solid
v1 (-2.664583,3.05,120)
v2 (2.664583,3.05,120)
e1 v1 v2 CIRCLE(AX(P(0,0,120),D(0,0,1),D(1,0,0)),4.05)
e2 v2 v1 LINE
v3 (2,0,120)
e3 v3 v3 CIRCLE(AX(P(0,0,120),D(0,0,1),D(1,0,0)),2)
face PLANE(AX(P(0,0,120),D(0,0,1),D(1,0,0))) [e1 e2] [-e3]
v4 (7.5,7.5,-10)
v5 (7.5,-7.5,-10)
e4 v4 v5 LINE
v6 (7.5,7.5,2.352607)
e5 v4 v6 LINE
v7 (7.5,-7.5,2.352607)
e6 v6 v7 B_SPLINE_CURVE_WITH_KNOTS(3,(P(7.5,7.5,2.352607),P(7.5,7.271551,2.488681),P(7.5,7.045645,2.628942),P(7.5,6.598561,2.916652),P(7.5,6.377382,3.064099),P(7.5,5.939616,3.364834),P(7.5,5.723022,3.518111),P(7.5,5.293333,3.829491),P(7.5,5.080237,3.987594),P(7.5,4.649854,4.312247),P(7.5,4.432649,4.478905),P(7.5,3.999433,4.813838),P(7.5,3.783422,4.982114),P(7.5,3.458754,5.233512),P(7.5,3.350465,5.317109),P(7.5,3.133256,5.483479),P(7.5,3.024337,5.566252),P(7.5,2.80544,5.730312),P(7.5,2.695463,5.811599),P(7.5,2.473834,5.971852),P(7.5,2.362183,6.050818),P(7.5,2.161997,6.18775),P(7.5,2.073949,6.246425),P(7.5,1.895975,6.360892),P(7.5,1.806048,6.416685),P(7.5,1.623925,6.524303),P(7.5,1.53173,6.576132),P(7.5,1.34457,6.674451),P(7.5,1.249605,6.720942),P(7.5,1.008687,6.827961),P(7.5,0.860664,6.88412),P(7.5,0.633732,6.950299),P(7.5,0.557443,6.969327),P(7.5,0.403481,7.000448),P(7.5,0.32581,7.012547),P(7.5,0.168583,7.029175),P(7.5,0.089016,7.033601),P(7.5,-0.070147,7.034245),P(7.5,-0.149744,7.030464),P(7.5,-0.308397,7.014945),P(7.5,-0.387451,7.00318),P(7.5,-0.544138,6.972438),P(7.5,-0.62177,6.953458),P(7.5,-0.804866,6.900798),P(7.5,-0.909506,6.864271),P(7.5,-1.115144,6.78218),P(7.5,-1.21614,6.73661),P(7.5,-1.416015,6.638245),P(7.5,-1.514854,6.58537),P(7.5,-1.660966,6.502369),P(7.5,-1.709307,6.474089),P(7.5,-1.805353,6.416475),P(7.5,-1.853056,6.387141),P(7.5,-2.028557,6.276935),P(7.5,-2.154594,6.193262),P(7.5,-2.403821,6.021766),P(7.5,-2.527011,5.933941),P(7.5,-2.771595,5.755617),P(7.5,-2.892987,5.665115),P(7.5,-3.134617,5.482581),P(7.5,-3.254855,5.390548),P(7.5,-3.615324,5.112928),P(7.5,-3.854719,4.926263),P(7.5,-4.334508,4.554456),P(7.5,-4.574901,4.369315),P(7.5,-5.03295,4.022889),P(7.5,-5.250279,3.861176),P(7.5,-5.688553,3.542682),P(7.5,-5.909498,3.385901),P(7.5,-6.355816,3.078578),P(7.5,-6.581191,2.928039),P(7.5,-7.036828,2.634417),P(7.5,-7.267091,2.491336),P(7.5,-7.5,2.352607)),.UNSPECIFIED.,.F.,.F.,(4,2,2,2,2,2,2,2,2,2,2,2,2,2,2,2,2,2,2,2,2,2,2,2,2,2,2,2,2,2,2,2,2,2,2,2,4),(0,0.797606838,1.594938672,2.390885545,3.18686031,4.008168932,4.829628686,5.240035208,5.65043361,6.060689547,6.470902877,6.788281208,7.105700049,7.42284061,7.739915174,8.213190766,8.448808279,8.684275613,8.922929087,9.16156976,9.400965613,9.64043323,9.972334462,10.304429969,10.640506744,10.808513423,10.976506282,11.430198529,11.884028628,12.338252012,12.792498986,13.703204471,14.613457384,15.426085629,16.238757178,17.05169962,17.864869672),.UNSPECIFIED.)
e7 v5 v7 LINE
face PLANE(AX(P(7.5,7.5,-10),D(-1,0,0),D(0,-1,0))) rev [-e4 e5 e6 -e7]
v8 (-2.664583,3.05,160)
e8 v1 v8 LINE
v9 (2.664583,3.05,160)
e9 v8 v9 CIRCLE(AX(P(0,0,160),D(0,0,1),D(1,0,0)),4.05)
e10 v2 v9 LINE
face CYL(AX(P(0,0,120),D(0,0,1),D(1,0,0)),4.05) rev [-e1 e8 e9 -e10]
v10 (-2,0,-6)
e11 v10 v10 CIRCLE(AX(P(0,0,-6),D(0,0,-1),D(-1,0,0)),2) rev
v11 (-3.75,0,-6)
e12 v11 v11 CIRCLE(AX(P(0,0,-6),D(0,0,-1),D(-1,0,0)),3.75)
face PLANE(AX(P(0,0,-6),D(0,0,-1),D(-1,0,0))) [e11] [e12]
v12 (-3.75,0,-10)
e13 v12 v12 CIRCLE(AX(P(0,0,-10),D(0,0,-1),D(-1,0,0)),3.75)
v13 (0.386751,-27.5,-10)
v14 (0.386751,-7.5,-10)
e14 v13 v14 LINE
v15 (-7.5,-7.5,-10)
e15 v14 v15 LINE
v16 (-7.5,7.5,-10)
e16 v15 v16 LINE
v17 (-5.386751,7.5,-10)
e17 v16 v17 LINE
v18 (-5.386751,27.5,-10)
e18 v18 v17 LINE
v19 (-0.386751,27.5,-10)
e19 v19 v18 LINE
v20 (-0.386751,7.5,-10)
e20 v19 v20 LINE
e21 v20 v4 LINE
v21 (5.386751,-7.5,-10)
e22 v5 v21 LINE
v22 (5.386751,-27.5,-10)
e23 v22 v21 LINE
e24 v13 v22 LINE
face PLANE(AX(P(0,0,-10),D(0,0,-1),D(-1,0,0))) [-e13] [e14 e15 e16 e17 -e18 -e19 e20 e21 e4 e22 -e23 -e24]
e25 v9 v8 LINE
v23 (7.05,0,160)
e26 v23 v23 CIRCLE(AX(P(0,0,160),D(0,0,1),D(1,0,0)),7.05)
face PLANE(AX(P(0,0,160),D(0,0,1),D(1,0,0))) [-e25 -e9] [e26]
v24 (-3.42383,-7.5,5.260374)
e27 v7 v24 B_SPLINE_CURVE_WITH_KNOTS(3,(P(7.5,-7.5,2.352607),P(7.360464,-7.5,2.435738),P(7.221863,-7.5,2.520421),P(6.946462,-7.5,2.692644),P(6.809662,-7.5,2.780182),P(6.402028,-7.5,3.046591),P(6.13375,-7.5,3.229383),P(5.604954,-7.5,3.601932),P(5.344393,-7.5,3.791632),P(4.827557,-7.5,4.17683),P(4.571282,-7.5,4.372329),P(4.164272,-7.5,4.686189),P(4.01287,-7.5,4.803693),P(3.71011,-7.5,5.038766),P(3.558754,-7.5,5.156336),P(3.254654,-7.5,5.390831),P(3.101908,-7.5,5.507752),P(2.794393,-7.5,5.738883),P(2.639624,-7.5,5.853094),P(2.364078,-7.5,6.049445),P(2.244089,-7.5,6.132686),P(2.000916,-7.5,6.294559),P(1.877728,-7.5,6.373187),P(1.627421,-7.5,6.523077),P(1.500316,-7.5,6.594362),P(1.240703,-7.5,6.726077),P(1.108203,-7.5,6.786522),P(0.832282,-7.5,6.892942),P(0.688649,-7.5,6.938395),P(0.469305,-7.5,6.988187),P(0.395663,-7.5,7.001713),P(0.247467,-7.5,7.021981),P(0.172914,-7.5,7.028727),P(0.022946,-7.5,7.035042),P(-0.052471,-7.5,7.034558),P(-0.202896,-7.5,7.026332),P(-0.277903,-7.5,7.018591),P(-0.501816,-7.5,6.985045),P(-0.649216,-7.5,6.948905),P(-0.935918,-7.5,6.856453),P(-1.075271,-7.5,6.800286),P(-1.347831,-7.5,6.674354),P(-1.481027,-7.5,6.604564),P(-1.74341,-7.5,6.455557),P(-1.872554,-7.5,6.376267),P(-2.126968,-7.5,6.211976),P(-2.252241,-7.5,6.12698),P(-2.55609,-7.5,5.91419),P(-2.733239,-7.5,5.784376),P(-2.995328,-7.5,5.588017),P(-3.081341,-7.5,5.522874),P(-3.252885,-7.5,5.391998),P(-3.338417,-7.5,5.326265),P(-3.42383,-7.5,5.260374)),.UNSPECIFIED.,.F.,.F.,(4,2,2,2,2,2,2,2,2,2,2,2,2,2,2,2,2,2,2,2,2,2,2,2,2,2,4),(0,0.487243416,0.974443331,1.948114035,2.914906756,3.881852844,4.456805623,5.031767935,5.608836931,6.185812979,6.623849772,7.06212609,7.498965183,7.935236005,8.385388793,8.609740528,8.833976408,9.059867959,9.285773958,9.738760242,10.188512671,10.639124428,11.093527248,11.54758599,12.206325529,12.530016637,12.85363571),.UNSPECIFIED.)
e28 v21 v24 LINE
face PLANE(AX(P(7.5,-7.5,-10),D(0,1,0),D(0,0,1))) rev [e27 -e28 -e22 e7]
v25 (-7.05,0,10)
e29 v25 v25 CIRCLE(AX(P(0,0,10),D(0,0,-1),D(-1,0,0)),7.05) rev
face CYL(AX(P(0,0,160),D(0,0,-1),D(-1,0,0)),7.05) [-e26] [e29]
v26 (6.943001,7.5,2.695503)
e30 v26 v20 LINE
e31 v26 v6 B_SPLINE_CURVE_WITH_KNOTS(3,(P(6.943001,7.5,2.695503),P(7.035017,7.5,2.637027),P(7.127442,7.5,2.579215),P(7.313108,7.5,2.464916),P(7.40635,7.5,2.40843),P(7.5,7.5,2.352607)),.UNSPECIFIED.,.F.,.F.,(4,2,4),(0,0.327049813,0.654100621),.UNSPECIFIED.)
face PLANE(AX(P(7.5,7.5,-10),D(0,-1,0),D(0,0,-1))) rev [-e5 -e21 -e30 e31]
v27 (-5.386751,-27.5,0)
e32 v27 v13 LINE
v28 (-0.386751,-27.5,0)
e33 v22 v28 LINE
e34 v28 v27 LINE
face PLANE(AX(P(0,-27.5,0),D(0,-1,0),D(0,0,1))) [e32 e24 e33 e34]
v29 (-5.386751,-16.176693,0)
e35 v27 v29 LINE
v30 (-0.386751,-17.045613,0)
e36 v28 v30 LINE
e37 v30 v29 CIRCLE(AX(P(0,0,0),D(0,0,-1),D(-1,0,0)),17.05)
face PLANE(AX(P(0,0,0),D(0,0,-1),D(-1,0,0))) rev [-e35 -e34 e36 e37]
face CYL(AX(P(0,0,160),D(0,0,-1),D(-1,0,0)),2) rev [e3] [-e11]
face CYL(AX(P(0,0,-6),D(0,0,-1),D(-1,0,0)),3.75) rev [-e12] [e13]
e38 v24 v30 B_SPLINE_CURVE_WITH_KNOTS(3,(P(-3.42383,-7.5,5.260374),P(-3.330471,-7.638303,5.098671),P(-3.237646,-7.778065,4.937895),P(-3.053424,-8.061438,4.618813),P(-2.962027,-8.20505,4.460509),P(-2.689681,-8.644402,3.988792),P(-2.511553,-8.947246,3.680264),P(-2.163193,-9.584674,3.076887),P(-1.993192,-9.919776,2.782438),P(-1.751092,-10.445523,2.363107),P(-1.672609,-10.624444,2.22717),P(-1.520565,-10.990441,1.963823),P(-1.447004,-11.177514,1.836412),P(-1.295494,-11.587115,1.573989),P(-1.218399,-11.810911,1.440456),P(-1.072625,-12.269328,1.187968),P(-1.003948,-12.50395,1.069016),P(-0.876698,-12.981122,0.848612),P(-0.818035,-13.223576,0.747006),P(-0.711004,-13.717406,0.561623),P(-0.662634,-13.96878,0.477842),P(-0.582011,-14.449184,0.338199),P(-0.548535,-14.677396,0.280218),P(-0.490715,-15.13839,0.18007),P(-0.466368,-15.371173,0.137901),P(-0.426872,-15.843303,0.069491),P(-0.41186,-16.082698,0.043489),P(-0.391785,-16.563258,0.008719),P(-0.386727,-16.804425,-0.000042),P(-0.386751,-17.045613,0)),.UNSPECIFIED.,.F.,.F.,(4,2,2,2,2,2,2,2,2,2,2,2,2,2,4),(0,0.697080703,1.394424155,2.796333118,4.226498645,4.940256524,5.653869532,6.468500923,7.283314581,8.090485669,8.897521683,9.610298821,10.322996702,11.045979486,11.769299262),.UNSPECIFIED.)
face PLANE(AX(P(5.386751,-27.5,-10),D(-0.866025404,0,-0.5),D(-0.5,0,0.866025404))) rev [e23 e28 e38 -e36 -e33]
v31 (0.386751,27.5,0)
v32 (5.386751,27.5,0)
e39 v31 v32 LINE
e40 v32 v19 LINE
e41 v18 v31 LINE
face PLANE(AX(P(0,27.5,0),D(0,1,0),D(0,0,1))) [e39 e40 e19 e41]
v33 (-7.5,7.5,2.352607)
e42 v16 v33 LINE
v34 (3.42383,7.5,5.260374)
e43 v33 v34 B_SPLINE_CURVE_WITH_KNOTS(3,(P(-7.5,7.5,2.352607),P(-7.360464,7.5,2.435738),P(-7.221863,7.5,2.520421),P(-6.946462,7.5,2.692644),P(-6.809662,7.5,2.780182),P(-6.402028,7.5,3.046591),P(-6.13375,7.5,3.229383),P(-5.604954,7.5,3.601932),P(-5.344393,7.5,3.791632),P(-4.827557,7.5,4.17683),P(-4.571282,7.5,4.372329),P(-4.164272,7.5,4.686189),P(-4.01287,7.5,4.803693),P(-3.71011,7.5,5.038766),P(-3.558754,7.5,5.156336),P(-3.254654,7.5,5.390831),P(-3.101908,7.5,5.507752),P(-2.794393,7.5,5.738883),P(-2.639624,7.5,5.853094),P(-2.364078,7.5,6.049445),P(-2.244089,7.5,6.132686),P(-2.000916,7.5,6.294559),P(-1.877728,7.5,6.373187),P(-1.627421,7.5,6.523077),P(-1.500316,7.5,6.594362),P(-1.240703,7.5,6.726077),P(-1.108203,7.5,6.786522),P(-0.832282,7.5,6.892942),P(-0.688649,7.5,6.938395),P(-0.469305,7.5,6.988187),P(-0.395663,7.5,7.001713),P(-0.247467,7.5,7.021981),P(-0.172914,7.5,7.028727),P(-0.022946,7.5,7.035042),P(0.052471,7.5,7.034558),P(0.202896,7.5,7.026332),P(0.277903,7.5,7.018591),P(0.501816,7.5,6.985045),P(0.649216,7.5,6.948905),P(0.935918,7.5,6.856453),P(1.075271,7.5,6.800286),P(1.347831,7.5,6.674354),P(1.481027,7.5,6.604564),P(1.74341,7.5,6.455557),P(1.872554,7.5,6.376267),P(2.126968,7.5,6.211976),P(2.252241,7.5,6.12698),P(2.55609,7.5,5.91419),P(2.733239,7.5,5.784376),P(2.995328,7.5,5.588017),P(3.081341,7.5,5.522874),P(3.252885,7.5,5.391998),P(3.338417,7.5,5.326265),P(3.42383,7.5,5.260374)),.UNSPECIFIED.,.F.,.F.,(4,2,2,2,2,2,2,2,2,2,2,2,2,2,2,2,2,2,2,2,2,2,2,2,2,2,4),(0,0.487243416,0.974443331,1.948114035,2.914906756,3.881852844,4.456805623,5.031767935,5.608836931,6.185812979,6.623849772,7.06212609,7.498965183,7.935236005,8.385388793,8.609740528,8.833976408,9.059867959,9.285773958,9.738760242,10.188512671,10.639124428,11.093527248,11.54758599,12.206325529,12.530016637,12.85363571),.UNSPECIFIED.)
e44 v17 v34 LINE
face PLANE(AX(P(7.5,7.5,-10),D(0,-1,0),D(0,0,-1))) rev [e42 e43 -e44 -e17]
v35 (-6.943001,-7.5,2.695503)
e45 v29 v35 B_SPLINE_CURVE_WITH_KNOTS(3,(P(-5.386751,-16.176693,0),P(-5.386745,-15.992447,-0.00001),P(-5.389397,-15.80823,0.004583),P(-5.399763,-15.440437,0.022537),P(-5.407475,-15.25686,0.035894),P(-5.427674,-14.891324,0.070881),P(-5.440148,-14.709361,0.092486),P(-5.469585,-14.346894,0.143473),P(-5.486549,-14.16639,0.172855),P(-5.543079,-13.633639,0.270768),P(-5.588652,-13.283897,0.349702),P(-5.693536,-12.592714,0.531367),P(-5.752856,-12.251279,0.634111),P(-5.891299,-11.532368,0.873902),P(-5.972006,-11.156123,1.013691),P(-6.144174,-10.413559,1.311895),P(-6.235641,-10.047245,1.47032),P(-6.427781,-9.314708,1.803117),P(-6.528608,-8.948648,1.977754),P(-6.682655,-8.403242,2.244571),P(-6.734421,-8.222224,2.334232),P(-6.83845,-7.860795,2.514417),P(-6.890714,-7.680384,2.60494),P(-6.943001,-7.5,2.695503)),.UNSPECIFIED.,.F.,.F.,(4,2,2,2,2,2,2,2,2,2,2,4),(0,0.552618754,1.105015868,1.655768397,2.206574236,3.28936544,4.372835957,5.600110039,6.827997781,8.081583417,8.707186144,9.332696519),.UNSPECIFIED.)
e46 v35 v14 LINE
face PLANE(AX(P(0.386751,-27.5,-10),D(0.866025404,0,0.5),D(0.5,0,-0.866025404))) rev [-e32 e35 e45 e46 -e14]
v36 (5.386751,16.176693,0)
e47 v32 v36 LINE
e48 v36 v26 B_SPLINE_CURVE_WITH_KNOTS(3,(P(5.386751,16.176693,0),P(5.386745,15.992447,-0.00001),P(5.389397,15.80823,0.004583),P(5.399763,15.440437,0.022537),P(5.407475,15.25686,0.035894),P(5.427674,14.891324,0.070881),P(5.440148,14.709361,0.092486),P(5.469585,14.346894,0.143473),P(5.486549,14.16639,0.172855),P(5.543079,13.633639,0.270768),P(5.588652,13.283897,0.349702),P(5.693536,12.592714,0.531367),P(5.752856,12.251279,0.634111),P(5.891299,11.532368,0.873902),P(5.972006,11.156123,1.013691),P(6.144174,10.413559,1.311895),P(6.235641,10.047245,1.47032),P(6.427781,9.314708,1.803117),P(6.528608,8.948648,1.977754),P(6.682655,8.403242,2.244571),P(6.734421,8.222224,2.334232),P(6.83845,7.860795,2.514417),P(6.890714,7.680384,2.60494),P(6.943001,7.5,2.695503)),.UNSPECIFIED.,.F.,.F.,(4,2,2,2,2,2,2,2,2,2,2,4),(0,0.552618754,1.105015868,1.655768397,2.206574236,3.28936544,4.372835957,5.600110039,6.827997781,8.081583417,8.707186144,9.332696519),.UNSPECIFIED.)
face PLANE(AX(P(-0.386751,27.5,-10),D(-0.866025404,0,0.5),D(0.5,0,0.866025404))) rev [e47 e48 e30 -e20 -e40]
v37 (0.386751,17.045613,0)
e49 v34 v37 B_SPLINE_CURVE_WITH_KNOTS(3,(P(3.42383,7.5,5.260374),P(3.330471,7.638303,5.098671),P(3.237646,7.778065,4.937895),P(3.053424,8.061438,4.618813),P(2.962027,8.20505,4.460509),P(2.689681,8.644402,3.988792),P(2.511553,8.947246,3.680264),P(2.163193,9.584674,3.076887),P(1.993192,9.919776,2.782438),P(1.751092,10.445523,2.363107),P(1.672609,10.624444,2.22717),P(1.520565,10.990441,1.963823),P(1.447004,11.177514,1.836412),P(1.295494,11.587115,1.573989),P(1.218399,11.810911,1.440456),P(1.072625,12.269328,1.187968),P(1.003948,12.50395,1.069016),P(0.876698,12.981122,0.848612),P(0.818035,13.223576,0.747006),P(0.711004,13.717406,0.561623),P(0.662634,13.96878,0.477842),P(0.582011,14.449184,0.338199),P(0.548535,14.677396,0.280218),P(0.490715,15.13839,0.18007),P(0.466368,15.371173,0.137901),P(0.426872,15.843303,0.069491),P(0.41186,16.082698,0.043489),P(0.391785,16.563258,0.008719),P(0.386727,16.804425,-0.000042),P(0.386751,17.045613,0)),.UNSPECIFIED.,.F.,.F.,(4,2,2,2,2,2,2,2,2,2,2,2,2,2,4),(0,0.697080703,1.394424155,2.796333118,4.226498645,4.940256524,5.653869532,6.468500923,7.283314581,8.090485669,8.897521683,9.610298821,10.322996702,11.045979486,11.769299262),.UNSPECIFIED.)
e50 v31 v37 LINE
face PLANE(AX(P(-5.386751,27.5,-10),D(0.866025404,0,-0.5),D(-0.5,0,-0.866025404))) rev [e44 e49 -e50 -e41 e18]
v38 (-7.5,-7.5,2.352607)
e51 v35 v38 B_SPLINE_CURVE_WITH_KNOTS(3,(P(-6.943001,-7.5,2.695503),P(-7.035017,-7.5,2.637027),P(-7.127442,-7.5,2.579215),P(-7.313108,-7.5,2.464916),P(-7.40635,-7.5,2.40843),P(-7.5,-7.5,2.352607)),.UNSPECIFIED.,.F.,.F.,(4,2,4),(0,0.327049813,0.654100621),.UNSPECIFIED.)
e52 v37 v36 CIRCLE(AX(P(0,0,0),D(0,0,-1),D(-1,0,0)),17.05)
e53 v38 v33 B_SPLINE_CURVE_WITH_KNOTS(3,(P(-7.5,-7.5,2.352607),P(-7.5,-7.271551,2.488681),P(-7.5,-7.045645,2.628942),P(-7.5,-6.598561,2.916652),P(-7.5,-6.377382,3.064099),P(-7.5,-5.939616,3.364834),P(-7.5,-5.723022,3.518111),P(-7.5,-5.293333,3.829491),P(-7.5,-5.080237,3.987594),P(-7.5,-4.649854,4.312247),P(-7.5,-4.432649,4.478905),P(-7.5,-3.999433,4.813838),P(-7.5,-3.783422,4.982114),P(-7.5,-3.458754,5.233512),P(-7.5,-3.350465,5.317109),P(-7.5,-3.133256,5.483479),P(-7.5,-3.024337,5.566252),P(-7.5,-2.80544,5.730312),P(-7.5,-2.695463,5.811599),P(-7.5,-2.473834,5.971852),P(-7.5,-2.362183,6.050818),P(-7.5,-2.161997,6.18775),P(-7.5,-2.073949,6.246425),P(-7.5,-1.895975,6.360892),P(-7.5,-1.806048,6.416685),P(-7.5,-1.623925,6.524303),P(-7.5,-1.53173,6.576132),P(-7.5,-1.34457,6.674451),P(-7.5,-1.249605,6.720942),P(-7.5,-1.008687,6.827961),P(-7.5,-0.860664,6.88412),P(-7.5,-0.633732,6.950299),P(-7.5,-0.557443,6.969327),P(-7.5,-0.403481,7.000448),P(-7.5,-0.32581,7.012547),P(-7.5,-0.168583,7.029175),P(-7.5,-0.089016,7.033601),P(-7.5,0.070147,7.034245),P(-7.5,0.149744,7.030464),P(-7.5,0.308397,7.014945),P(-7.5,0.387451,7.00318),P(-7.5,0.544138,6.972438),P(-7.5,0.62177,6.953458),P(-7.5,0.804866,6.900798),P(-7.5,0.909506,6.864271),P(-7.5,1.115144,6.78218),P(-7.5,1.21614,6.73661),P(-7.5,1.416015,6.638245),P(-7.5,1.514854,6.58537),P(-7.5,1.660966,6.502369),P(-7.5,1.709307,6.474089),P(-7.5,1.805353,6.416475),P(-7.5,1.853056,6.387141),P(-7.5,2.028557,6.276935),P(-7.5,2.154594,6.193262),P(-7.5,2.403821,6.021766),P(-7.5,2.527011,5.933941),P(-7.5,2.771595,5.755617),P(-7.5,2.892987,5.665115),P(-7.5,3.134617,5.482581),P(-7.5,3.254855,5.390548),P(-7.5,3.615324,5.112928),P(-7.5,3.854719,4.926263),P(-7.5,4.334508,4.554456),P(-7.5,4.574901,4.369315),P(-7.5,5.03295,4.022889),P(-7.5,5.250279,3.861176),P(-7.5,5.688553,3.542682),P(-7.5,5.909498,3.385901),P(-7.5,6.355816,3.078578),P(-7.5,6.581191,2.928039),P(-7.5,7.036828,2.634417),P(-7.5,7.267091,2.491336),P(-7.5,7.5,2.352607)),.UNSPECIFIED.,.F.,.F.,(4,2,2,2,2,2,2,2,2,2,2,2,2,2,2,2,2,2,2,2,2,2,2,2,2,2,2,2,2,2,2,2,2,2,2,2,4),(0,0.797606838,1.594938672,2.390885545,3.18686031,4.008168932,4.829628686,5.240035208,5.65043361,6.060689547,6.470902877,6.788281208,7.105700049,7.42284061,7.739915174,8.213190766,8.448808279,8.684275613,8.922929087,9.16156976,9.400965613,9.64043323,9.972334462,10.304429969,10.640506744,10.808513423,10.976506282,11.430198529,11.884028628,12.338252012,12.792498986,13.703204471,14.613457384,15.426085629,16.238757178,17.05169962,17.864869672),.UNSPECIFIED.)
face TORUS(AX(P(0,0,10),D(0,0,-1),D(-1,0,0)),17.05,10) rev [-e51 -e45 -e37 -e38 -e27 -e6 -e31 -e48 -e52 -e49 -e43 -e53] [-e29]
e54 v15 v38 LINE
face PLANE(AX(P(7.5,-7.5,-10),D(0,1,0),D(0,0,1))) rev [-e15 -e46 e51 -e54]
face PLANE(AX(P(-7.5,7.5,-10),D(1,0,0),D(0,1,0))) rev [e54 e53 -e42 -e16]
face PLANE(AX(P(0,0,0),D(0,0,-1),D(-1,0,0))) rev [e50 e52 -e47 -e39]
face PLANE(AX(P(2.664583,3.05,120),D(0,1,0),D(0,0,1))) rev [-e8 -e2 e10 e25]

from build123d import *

# Parameters (mm, degrees)
SKETCH1_R           = 7.05
SKETCH1_R_2         = 4.05
BOSS_EXTRUDE1_DEPTH = 160
SKETCH3_W           = 15
SKETCH3_H           = 15
BOSS_EXTRUDE2_DEPTH = 10
BOSS_EXTRUDE3_DEPTH = 20
CIRPATTERN1_COUNT   = 2
FILLET1_R           = 10
CUT_EXTRUDE2_DEPTH  = 40
SKETCH6_R           = 2
CUT_EXTRUDE3_DEPTH  = 173.37314178
SKETCH7_R           = 3.75
CUT_EXTRUDE4_DEPTH  = 4


with BuildPart() as part:
    # Sketch1 → Boss-Extrude1 (new body)
    # profile 1 of 2: a face of its own
    with BuildSketch(Plane.XY):
        Circle(SKETCH1_R)
        Circle(SKETCH1_R_2, mode=Mode.SUBTRACT)
    # profile 2 of 2: a face of its own
    with BuildSketch(Plane.XY):
        Circle(SKETCH1_R_2)
    extrude(amount=BOSS_EXTRUDE1_DEPTH)

    # Sketch3 → Boss-Extrude2 (add)
    with BuildSketch(Plane(origin=(0, 0, 0), x_dir=(-1, 0, 0), z_dir=(0, 0, -1))):
        Rectangle(SKETCH3_W, SKETCH3_H)
    extrude(amount=BOSS_EXTRUDE2_DEPTH)

    # Sketch4 → Boss-Extrude3 (add)
    with BuildSketch(Plane(origin=(0, 7.5, 0), x_dir=(1, 0, 0), z_dir=(0, 1, 0))):
        Polygon((-0.386751346, 10), (5.386751346, 0), (0.386751346, 0), (-5.386751346, 10), align=None)
    boss_extrude3 = extrude(amount=BOSS_EXTRUDE3_DEPTH)

    # CirPattern1: Boss-Extrude3 ×2 about axis
    cirpattern1_axis = Axis((0, 0, 0), (0, 0, 1))
    for i in range(1, CIRPATTERN1_COUNT):
        add(boss_extrude3.rotate(cirpattern1_axis, i * 360 / CIRPATTERN1_COUNT))

    # Fillet1
    # the kernel refuses this fillet: 10 mm, written as the material it adds along each edge
    with BuildSketch(Plane(origin=(0, 0, 0), x_dir=(1, 0, 0), z_dir=(0, -1, 0))) as fillet1_piece_1_section:
        with BuildLine():
            CenterArc((7.05 + FILLET1_R, FILLET1_R), FILLET1_R, 180, 90)
            Line((7.05, FILLET1_R), (7.05, 0))
            Line((7.05, 0), (7.05 + FILLET1_R, 0))
        make_face()
    fillet1_piece_1 = revolve(axis=Axis((0, 0, 0), (0, 0, 1)), mode=Mode.PRIVATE)
    fillet1_piece_1 = split(fillet1_piece_1, bisect_by=Plane(origin=(7.384958352, 7.5, 2.9516764), z_dir=(0, -1, 0)), keep=Keep.TOP, mode=Mode.PRIVATE)
    fillet1_piece_1 = split(fillet1_piece_1, bisect_by=Plane(origin=(7.5, 6.602416729, 2.9516764), z_dir=(-1, 0, 0)), keep=Keep.TOP, mode=Mode.PRIVATE)
    fillet1_piece_1 = split(fillet1_piece_1, bisect_by=Plane(origin=(-7.5, 6.602416729, 2.9516764), z_dir=(1, 0, 0)), keep=Keep.TOP, mode=Mode.PRIVATE)
    fillet1_piece_1 = split(fillet1_piece_1, bisect_by=Plane(origin=(7.384958352, -7.5, 2.9516764), z_dir=(0, 1, 0)), keep=Keep.TOP, mode=Mode.PRIVATE)
    add(fillet1_piece_1)
    with BuildSketch(Plane(origin=(0, 0, 0), x_dir=(1, 0, 0), z_dir=(0, -1, 0))) as fillet1_piece_2_section:
        with BuildLine():
            CenterArc((7.05 + FILLET1_R, FILLET1_R), FILLET1_R, 180, 90)
            Line((7.05, FILLET1_R), (7.05, 0))
            Line((7.05, 0), (7.05 + FILLET1_R, 0))
        make_face()
    fillet1_piece_2 = revolve(axis=Axis((0, 0, 0), (0, 0, 1)), mode=Mode.PRIVATE)
    fillet1_piece_2 = split(fillet1_piece_2, bisect_by=Plane(origin=(5.410380514, 9.830478865, 0.040926919), z_dir=(-0.8660254037844362, 0, 0.5000000000000043)), keep=Keep.TOP, mode=Mode.PRIVATE)
    fillet1_piece_2 = split(fillet1_piece_2, bisect_by=Plane(origin=(7.5, 9.830478865, 1.235681154), z_dir=(-1, 0, 0)), keep=Keep.TOP, mode=Mode.PRIVATE)
    fillet1_piece_2 = split(fillet1_piece_2, bisect_by=Plane(origin=(1.660380514, 9.830478865, 2.205990428), z_dir=(0.8660254037844359, 0, -0.5000000000000047)), keep=Keep.TOP, mode=Mode.PRIVATE)
    fillet1_piece_2 = split(fillet1_piece_2, bisect_by=Plane(origin=(3.341005476, -7.5, 1.235681154), z_dir=(0, 1, 0)), keep=Keep.TOP, mode=Mode.PRIVATE)
    add(fillet1_piece_2)
    with BuildSketch(Plane(origin=(0, 0, 0), x_dir=(1, 0, 0), z_dir=(0, -1, 0))) as fillet1_piece_3_section:
        with BuildLine():
            CenterArc((7.05 + FILLET1_R, FILLET1_R), FILLET1_R, 180, 90)
            Line((7.05, FILLET1_R), (7.05, 0))
            Line((7.05, 0), (7.05 + FILLET1_R, 0))
        make_face()
    fillet1_piece_3 = revolve(axis=Axis((0, 0, 0), (0, 0, 1)), mode=Mode.PRIVATE)
    fillet1_piece_3 = split(fillet1_piece_3, bisect_by=Plane(origin=(-3.341005467, -7.5, 1.235681156), z_dir=(0, -1, 0)), keep=Keep.TOP, mode=Mode.PRIVATE)
    fillet1_piece_3 = split(fillet1_piece_3, bisect_by=Plane(origin=(-5.410380512, -9.830478864, 0.040926917), z_dir=(0.8660254037844362, 0, 0.5000000000000043)), keep=Keep.TOP, mode=Mode.PRIVATE)
    fillet1_piece_3 = split(fillet1_piece_3, bisect_by=Plane(origin=(-1.660380512, -9.830478864, 2.205990426), z_dir=(-0.8660254037844359, 0, -0.5000000000000047)), keep=Keep.TOP, mode=Mode.PRIVATE)
    add(fillet1_piece_3)

    # Sketch5 → Cut-Extrude2 (cut)
    with BuildSketch(Plane.XY.offset(160)):
        with BuildLine():
            Line((2.664582519, 3.05), (-2.664582519, 3.05))
            ThreePointArc((-2.664582519, 3.05), (0, -4.05), (2.664582519, 3.05))
        make_face()
    extrude(amount=-CUT_EXTRUDE2_DEPTH, mode=Mode.SUBTRACT)

    # Sketch6 → Cut-Extrude3 (cut, through all)
    with BuildSketch(Plane(origin=(0, 0, -10), x_dir=(-1, 0, 0), z_dir=(0, 0, -1))):
        Circle(SKETCH6_R)
    extrude(amount=-CUT_EXTRUDE3_DEPTH, mode=Mode.SUBTRACT)

    # Sketch7 → Cut-Extrude4 (cut)
    with BuildSketch(Plane(origin=(0, 0, -10), x_dir=(-1, 0, 0), z_dir=(0, 0, -1))):
        Circle(SKETCH7_R)
    extrude(amount=-CUT_EXTRUDE4_DEPTH, mode=Mode.SUBTRACT)


solid = part.part
